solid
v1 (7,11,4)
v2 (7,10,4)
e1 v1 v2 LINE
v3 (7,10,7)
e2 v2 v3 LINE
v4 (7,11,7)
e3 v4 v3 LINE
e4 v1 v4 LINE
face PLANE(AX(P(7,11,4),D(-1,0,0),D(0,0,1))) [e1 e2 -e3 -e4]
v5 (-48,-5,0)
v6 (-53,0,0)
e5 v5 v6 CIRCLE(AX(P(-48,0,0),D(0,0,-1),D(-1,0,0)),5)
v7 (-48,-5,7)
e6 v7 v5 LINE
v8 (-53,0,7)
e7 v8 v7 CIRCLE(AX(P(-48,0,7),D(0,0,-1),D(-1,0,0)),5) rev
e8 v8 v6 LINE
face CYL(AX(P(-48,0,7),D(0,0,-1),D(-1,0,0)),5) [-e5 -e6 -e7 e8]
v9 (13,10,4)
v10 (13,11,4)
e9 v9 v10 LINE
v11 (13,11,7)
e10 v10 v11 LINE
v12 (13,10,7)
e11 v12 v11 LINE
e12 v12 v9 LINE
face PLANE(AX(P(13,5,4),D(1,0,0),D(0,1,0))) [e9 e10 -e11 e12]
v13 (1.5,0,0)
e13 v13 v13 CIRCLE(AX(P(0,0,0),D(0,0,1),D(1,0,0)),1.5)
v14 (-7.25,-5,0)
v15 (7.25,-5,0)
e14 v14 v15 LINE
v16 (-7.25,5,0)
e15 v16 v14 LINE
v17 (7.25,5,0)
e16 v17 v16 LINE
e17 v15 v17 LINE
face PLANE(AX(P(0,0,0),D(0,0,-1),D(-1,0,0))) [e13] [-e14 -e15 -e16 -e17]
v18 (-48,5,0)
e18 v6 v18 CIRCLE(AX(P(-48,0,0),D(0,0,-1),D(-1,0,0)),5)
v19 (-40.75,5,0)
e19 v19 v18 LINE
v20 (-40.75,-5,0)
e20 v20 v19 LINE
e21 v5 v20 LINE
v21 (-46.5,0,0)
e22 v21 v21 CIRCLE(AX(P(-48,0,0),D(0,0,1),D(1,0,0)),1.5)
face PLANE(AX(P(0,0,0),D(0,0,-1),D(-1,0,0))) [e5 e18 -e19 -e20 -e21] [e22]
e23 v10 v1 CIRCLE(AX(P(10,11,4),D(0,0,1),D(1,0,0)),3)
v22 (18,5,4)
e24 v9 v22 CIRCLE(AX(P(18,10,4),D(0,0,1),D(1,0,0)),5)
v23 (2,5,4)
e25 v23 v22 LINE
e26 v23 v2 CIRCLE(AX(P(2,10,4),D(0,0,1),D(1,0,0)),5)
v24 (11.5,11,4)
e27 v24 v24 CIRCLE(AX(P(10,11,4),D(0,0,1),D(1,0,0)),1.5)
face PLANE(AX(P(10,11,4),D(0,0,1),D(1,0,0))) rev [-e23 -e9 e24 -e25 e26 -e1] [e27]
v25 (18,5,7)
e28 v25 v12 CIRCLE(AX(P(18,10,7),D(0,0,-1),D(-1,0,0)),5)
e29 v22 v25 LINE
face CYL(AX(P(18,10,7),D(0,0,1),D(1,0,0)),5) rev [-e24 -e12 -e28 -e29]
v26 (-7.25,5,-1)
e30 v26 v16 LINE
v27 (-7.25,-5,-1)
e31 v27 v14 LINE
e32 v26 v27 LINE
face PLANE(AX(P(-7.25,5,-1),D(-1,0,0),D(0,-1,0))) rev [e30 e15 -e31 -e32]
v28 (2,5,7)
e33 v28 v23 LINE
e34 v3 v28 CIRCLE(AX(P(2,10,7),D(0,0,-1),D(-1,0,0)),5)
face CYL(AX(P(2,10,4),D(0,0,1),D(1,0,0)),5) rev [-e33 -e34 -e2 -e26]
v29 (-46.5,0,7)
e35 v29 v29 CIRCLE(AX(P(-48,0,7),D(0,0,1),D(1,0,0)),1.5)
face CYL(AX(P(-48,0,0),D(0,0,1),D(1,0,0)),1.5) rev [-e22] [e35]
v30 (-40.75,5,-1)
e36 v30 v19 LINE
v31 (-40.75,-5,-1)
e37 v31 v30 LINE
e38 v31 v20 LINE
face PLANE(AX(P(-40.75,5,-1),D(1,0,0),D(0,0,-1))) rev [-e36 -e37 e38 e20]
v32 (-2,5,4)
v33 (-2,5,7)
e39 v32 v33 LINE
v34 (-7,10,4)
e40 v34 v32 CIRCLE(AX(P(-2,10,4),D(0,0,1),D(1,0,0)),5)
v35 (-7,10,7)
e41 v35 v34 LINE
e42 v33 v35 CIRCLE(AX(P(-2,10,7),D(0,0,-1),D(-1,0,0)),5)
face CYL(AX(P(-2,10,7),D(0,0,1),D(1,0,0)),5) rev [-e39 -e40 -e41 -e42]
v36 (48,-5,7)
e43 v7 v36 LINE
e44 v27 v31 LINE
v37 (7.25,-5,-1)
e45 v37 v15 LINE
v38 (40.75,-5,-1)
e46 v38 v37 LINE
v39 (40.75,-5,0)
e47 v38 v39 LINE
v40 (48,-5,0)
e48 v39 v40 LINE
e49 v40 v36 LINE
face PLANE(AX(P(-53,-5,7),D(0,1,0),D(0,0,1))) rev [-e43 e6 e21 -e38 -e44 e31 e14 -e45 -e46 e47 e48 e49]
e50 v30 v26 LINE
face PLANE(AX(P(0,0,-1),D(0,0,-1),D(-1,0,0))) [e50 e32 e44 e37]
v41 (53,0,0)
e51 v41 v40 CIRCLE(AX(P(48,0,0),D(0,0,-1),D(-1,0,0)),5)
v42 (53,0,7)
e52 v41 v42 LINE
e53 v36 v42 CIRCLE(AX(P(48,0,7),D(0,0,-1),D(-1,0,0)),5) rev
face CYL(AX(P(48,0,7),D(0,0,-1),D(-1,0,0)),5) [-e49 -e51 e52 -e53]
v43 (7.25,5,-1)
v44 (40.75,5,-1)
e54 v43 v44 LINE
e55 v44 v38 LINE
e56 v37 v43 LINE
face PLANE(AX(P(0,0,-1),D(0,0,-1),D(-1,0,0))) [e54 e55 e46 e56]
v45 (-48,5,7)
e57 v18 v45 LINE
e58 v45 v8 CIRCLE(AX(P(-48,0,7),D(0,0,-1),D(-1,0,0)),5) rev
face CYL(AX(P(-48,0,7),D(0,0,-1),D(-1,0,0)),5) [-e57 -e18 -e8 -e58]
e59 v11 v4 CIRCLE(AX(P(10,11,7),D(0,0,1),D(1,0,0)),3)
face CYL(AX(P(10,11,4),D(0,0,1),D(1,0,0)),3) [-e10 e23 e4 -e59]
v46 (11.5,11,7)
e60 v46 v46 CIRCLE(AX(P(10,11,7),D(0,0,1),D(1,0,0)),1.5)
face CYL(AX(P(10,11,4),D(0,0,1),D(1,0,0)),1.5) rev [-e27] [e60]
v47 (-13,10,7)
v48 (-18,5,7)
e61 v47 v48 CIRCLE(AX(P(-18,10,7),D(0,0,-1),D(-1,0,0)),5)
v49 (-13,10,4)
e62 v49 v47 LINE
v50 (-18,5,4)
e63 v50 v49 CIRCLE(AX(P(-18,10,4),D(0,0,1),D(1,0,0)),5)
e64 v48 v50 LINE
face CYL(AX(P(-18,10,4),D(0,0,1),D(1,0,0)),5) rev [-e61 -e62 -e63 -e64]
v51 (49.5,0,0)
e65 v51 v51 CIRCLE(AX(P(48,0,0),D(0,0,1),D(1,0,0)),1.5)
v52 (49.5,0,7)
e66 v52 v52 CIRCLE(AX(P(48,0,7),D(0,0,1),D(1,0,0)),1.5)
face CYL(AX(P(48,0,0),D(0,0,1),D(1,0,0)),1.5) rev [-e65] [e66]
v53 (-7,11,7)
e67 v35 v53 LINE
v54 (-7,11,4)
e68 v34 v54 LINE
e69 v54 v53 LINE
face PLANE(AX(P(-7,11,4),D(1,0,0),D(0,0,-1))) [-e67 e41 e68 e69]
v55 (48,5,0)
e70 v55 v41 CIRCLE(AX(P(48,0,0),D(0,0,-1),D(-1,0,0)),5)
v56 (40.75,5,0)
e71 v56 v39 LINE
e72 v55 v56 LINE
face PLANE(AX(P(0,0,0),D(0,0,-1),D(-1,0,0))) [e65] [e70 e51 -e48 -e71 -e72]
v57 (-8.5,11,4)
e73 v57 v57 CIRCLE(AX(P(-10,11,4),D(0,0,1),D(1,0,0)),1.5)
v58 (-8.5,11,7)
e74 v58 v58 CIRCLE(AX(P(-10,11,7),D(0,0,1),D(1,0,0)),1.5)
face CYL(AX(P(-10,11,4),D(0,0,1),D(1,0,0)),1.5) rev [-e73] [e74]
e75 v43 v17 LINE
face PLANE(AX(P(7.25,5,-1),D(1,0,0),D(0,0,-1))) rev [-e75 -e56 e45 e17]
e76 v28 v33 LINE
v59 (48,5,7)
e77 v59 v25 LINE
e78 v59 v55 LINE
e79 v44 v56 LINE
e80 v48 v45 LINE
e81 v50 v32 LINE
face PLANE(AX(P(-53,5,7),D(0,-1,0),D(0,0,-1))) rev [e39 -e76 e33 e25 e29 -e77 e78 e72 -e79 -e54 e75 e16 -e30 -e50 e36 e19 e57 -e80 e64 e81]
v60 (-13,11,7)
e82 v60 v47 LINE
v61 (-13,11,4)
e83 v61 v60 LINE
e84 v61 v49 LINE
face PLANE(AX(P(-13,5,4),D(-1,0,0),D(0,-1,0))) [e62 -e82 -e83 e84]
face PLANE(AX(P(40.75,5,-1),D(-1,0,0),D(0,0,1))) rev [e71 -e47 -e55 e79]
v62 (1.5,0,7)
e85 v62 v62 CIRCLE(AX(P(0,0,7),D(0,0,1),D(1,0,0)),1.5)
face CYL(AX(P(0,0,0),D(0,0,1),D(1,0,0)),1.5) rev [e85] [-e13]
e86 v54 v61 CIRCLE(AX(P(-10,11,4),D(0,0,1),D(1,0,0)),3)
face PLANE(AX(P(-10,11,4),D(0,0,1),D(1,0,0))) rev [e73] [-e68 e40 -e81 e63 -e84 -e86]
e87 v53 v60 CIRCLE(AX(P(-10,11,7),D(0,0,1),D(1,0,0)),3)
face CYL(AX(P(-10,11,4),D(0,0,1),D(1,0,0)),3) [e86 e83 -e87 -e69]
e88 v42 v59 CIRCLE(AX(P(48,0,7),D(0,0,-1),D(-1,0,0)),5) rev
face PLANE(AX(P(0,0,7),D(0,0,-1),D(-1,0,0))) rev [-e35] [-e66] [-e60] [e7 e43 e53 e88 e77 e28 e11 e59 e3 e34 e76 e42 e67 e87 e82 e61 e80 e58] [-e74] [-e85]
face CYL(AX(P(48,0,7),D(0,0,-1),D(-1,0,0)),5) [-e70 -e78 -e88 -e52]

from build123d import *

# Parameters (mm, degrees)
SKETCH1_W           = 106
SKETCH1_H           = 10
BOSS_EXTRUDE1_DEPTH = 7
FILLET1_R           = 5
SKETCH2_R           = 1.5
CUT_EXTRUDE1_DEPTH  = 54.693575035
SKETCH3_R           = 1.5
BOSS_EXTRUDE2_DEPTH = 3
FILLET2_R           = 5
FILLET3_R           = 5
FILLET4_R           = 5
SKETCH4_W           = 33.5
SKETCH4_H           = 10
BOSS_EXTRUDE3_DEPTH = 1


with BuildPart() as part:
    # Sketch1 → Boss-Extrude1 (new body)
    with BuildSketch(Plane.XY):
        Rectangle(SKETCH1_W, SKETCH1_H)
    extrude(amount=BOSS_EXTRUDE1_DEPTH)

    # Fillet1
    fillet1_edges = [part.edges().sort_by_distance(p)[0] for p in [
        (-53, -5, 3.5),
        (53, -5, 3.5),
        (53, 5, 3.5),
        (-53, 5, 3.5),
    ]]
    fillet(fillet1_edges, radius=FILLET1_R - 0.0001)  # a hair under: the kernel refuses the full size

    # Sketch2 → Cut-Extrude1 (cut, through all)
    with BuildSketch(Plane.XY.offset(7)):
        with Locations((-48, 0)):
            Circle(SKETCH2_R)
        with Locations((48, 0)):
            Circle(SKETCH2_R)
        Circle(SKETCH2_R)
    extrude(amount=-CUT_EXTRUDE1_DEPTH, mode=Mode.SUBTRACT)

    # Sketch3 → Boss-Extrude2 (add)
    # profile 1 of 2: a face of its own
    with BuildSketch(Plane.XY.offset(7)):
        with BuildLine():
            Line((7, 11), (7, 5))
            Line((7, 5), (13, 5))
            Line((13, 5), (13, 11))
            ThreePointArc((13, 11), (10, 14), (7, 11))
        make_face()
        with Locations((10, 11)):
            Circle(SKETCH3_R, mode=Mode.SUBTRACT)
    # profile 2 of 2: a face of its own
    with BuildSketch(Plane.XY.offset(7)):
        with BuildLine():
            Line((-7, 11), (-7, 5))
            Line((-7, 5), (-13, 5))
            Line((-13, 5), (-13, 11))
            ThreePointArc((-13, 11), (-10, 14), (-7, 11))
        make_face()
        with Locations((-10, 11)):
            Circle(SKETCH3_R, mode=Mode.SUBTRACT)
    extrude(amount=-BOSS_EXTRUDE2_DEPTH)

    # Fillet2
    fillet2_edges = [part.edges().sort_by_distance(p)[0] for p in [
        (-13, 5, 5.5),
    ]]
    fillet(fillet2_edges, radius=FILLET2_R)

    # Fillet3
    fillet3_edges = [part.edges().sort_by_distance(p)[0] for p in [
        (7, 5, 5.5),
        (-7, 5, 5.5),
    ]]
    fillet(fillet3_edges, radius=FILLET3_R)

    # Fillet4
    fillet4_edges = [part.edges().sort_by_distance(p)[0] for p in [
        (13, 5, 5.5),
    ]]
    fillet(fillet4_edges, radius=FILLET4_R)

    # Sketch4 → Boss-Extrude3 (add)
    with BuildSketch(Plane(origin=(0, 0, 0), x_dir=(-1, 0, 0), z_dir=(0, 0, -1))):
        with Locations((-24, 0)):
            Rectangle(SKETCH4_W, SKETCH4_H)
        with Locations((24, 0)):
            Rectangle(SKETCH4_W, SKETCH4_H)
    extrude(amount=BOSS_EXTRUDE3_DEPTH)


solid = part.part
